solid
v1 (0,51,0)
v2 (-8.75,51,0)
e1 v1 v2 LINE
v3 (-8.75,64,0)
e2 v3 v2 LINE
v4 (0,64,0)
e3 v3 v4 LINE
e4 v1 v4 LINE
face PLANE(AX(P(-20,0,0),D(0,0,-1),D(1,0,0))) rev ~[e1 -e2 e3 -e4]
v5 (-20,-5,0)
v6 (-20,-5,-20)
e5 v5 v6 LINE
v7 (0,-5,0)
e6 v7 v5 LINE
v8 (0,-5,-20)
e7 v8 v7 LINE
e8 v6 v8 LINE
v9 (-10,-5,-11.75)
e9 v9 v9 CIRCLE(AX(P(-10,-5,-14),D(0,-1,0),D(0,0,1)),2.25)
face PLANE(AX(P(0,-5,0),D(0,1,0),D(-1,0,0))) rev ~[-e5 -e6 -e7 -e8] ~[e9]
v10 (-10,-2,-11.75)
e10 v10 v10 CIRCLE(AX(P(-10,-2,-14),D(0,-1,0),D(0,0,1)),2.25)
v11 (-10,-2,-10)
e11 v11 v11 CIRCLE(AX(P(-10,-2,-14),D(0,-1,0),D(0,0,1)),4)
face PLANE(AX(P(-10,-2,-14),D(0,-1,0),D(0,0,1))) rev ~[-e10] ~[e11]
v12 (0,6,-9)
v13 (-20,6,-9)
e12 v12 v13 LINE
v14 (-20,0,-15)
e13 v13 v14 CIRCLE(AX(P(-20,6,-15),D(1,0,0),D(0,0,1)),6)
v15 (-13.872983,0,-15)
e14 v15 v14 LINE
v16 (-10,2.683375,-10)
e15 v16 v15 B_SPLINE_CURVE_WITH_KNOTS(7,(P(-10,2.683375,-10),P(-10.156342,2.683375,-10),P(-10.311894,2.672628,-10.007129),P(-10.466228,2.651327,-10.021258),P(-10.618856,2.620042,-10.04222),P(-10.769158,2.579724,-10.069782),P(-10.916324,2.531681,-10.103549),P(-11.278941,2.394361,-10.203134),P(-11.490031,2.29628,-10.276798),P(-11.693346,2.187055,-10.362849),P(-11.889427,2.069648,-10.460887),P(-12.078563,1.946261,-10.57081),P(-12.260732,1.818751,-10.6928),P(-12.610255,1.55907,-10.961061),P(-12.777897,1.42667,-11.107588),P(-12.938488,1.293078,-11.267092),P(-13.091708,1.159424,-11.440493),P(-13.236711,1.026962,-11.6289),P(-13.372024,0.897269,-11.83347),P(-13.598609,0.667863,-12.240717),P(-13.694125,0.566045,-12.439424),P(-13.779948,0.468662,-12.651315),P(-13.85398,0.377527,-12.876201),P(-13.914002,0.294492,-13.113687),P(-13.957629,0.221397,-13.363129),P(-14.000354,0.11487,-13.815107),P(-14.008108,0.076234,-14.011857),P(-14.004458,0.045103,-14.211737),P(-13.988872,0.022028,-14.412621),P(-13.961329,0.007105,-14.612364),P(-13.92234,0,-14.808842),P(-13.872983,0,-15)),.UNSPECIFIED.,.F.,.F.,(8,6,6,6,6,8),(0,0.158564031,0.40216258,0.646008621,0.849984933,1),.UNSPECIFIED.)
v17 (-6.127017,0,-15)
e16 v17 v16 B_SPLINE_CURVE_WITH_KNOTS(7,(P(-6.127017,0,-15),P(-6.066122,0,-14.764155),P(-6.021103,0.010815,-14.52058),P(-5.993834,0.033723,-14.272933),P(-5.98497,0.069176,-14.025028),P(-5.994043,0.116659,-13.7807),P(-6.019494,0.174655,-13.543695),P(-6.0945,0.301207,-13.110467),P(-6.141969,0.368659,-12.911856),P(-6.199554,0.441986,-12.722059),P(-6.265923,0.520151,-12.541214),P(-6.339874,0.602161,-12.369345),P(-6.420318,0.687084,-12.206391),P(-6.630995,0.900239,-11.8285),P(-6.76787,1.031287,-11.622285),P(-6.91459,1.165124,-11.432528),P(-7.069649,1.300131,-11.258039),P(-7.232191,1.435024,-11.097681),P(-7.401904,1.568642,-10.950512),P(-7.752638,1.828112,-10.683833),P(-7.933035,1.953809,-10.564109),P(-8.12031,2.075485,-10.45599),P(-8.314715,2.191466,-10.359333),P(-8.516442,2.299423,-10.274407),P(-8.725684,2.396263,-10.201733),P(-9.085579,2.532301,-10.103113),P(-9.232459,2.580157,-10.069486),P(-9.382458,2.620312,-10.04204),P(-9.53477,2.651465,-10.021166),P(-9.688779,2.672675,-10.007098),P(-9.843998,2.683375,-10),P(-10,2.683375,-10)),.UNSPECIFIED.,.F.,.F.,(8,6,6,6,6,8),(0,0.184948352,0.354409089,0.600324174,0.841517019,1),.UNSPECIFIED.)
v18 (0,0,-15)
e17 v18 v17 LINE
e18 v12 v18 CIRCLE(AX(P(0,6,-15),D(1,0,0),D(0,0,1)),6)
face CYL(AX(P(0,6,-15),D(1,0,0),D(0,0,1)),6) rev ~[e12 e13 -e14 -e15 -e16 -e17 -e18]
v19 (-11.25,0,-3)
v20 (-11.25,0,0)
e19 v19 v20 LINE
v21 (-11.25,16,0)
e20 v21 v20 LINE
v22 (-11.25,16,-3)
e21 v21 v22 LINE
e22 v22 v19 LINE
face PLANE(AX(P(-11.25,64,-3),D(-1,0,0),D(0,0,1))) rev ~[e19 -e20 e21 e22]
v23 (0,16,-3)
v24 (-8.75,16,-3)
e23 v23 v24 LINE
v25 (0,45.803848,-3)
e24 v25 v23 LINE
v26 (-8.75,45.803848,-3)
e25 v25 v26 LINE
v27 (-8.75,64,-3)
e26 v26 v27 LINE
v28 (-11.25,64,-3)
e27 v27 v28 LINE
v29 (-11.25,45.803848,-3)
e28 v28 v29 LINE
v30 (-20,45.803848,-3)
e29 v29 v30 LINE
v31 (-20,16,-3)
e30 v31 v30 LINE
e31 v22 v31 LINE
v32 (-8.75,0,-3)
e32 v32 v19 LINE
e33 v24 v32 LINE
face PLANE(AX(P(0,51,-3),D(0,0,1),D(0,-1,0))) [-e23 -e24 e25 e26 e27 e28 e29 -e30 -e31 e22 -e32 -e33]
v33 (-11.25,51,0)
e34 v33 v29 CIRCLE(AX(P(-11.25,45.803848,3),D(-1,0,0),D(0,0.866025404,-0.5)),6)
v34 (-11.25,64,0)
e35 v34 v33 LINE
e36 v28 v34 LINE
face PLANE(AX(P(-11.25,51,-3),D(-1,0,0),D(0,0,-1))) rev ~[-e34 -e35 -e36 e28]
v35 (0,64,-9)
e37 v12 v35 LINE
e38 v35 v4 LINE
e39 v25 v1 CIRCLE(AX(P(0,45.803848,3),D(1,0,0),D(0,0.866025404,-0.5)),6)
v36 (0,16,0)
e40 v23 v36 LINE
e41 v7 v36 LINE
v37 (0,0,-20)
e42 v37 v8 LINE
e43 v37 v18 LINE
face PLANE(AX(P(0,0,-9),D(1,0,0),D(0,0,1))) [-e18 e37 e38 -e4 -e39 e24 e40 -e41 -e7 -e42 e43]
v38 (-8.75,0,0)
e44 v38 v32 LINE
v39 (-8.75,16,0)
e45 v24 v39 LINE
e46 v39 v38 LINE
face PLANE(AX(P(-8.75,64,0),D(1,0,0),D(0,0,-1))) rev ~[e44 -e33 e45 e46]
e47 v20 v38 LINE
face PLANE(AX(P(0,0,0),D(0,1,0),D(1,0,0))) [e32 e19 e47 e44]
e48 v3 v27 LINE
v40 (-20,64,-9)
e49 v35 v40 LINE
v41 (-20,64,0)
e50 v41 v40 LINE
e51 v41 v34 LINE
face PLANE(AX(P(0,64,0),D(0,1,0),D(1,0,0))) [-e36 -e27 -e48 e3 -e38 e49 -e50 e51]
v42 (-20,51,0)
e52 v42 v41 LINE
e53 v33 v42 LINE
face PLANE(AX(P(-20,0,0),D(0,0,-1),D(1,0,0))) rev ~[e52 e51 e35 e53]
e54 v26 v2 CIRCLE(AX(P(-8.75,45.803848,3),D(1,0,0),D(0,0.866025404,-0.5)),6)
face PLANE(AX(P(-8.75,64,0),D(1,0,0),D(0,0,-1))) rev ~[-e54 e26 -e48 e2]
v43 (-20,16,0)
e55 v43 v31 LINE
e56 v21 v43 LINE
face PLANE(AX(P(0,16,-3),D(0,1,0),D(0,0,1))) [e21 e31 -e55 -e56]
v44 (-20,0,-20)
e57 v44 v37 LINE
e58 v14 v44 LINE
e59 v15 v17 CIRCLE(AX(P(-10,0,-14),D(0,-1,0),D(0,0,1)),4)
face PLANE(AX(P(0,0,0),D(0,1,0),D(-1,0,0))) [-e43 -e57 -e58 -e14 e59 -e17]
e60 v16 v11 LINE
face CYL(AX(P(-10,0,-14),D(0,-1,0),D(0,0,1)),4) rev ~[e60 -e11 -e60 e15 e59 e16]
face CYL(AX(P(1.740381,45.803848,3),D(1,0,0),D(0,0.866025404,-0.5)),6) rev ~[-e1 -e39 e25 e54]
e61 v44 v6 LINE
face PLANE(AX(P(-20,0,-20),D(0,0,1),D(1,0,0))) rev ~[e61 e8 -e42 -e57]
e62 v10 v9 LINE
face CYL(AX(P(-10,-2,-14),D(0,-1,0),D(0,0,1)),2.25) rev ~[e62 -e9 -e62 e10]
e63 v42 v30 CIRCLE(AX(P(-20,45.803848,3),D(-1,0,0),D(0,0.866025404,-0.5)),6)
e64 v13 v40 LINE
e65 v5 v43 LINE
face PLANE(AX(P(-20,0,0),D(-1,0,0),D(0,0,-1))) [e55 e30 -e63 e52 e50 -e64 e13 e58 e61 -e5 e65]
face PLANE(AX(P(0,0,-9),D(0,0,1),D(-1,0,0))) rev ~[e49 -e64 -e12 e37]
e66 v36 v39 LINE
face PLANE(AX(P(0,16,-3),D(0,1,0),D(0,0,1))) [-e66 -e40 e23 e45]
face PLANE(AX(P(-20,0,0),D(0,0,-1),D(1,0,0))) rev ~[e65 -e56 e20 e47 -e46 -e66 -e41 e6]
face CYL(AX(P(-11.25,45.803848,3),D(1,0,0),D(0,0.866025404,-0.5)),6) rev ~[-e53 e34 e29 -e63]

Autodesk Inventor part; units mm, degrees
ref_plane "YZ Plane" through (0, 0, 0) normal (1, 0, 0) x (0, 1, 0)
ref_plane "XZ Plane" through (0, 0, 0) normal (0, 1, 0) x (-1, 0, 0)
ref_plane "XY Plane" through (0, 0, 0) normal (0, 0, 1) x (1, 0, 0)
sketch "Sketch1" plane through (0, 0, 0) normal (0, 1, 0) x (-1, 0, 0)
  line L0 (0, 0) -> (20, 0)
  line L1 (20, 0) -> (20, -20)
  line L2 (20, -20) -> (0, -20)
  line L3 (0, -20) -> (0, 0)
  point P0 (10, -14)
  dimension "d0" = 20
  dimension "d1" = 20
  dimension "d4" = 10
  dimension "d5" = 6
extrude "Extrusion1" add sketch "Sketch1" against normal blind 5
hole "Hole1" at (-10, 0, -14) direction (0, -1, 0) diameter 4.5 end through all counterbore diameter 8 counterbore depth 2
sketch "Sketch2" plane through (0, 0, 0) normal (0, 1, 0) x (1, 0, 0)
  line L0 (-20, 0) -> (-20, 20) projected
  line L1 (0, 20) -> (0, 0) projected
  line L2 (-20, 0) -> (0, 0)
  line L3 (0, 0) -> (0, 9)
  line L4 (0, 9) -> (-20, 9)
  line L5 (-20, 9) -> (-20, 0)
  line L6 (-20, 3) -> (0, 3) construction
  dimension "d13" = 9
  dimension "d14" = 3
extrude "Extrusion2" add sketch "Sketch2" along normal blind 64
sketch "Sketch3" plane through (0, 64, 0) normal (0, 1, 0) x (1, 0, 0)
  line L0 (-11.25, 0) -> (-8.75, 0)
  line L1 (-8.75, 0) -> (-8.75, 3)
  line L2 (-8.75, 3) -> (-11.25, 3)
  line L3 (-11.25, 3) -> (-11.25, 0)
  line L4 (-20, 9) -> (-20, 0) projected
  point P0 (0, 0)
  dimension "d17" = 2.5
  dimension "d18" = 3
  dimension "d19" = 8.75
fillet "Fillet1" radius 6 1 edges at (-10, 0, -9)
extrude "Extrusion3" cut sketch "Sketch3" against normal blind 64
sketch "Sketch4" plane through (0, -5, -20) normal (1, 0, 0) x (0, 0, -1)
  line L0 (-20, 0) -> (-20, 69) projected
  line L1 (-17, 5) -> (-20, 5) projected
  line L2 (-20, 56) -> (-17, 56)
  line L3 (-17, 56) -> (-17, 21)
  line L4 (-17, 21) -> (-20, 21)
  line L5 (-20, 21) -> (-20, 56)
  line L6 (-20, 69) -> (-11, 69) projected
  dimension "d23" = 16
  dimension "d25" = 13
extrude "Extrusion4" cut sketch "Sketch4" against normal blind 64
fillet "Fillet2" radius 6 2 edges at (-15.625, 51, -3) (-4.375, 51, -3)
properties part number "support_lcd"
